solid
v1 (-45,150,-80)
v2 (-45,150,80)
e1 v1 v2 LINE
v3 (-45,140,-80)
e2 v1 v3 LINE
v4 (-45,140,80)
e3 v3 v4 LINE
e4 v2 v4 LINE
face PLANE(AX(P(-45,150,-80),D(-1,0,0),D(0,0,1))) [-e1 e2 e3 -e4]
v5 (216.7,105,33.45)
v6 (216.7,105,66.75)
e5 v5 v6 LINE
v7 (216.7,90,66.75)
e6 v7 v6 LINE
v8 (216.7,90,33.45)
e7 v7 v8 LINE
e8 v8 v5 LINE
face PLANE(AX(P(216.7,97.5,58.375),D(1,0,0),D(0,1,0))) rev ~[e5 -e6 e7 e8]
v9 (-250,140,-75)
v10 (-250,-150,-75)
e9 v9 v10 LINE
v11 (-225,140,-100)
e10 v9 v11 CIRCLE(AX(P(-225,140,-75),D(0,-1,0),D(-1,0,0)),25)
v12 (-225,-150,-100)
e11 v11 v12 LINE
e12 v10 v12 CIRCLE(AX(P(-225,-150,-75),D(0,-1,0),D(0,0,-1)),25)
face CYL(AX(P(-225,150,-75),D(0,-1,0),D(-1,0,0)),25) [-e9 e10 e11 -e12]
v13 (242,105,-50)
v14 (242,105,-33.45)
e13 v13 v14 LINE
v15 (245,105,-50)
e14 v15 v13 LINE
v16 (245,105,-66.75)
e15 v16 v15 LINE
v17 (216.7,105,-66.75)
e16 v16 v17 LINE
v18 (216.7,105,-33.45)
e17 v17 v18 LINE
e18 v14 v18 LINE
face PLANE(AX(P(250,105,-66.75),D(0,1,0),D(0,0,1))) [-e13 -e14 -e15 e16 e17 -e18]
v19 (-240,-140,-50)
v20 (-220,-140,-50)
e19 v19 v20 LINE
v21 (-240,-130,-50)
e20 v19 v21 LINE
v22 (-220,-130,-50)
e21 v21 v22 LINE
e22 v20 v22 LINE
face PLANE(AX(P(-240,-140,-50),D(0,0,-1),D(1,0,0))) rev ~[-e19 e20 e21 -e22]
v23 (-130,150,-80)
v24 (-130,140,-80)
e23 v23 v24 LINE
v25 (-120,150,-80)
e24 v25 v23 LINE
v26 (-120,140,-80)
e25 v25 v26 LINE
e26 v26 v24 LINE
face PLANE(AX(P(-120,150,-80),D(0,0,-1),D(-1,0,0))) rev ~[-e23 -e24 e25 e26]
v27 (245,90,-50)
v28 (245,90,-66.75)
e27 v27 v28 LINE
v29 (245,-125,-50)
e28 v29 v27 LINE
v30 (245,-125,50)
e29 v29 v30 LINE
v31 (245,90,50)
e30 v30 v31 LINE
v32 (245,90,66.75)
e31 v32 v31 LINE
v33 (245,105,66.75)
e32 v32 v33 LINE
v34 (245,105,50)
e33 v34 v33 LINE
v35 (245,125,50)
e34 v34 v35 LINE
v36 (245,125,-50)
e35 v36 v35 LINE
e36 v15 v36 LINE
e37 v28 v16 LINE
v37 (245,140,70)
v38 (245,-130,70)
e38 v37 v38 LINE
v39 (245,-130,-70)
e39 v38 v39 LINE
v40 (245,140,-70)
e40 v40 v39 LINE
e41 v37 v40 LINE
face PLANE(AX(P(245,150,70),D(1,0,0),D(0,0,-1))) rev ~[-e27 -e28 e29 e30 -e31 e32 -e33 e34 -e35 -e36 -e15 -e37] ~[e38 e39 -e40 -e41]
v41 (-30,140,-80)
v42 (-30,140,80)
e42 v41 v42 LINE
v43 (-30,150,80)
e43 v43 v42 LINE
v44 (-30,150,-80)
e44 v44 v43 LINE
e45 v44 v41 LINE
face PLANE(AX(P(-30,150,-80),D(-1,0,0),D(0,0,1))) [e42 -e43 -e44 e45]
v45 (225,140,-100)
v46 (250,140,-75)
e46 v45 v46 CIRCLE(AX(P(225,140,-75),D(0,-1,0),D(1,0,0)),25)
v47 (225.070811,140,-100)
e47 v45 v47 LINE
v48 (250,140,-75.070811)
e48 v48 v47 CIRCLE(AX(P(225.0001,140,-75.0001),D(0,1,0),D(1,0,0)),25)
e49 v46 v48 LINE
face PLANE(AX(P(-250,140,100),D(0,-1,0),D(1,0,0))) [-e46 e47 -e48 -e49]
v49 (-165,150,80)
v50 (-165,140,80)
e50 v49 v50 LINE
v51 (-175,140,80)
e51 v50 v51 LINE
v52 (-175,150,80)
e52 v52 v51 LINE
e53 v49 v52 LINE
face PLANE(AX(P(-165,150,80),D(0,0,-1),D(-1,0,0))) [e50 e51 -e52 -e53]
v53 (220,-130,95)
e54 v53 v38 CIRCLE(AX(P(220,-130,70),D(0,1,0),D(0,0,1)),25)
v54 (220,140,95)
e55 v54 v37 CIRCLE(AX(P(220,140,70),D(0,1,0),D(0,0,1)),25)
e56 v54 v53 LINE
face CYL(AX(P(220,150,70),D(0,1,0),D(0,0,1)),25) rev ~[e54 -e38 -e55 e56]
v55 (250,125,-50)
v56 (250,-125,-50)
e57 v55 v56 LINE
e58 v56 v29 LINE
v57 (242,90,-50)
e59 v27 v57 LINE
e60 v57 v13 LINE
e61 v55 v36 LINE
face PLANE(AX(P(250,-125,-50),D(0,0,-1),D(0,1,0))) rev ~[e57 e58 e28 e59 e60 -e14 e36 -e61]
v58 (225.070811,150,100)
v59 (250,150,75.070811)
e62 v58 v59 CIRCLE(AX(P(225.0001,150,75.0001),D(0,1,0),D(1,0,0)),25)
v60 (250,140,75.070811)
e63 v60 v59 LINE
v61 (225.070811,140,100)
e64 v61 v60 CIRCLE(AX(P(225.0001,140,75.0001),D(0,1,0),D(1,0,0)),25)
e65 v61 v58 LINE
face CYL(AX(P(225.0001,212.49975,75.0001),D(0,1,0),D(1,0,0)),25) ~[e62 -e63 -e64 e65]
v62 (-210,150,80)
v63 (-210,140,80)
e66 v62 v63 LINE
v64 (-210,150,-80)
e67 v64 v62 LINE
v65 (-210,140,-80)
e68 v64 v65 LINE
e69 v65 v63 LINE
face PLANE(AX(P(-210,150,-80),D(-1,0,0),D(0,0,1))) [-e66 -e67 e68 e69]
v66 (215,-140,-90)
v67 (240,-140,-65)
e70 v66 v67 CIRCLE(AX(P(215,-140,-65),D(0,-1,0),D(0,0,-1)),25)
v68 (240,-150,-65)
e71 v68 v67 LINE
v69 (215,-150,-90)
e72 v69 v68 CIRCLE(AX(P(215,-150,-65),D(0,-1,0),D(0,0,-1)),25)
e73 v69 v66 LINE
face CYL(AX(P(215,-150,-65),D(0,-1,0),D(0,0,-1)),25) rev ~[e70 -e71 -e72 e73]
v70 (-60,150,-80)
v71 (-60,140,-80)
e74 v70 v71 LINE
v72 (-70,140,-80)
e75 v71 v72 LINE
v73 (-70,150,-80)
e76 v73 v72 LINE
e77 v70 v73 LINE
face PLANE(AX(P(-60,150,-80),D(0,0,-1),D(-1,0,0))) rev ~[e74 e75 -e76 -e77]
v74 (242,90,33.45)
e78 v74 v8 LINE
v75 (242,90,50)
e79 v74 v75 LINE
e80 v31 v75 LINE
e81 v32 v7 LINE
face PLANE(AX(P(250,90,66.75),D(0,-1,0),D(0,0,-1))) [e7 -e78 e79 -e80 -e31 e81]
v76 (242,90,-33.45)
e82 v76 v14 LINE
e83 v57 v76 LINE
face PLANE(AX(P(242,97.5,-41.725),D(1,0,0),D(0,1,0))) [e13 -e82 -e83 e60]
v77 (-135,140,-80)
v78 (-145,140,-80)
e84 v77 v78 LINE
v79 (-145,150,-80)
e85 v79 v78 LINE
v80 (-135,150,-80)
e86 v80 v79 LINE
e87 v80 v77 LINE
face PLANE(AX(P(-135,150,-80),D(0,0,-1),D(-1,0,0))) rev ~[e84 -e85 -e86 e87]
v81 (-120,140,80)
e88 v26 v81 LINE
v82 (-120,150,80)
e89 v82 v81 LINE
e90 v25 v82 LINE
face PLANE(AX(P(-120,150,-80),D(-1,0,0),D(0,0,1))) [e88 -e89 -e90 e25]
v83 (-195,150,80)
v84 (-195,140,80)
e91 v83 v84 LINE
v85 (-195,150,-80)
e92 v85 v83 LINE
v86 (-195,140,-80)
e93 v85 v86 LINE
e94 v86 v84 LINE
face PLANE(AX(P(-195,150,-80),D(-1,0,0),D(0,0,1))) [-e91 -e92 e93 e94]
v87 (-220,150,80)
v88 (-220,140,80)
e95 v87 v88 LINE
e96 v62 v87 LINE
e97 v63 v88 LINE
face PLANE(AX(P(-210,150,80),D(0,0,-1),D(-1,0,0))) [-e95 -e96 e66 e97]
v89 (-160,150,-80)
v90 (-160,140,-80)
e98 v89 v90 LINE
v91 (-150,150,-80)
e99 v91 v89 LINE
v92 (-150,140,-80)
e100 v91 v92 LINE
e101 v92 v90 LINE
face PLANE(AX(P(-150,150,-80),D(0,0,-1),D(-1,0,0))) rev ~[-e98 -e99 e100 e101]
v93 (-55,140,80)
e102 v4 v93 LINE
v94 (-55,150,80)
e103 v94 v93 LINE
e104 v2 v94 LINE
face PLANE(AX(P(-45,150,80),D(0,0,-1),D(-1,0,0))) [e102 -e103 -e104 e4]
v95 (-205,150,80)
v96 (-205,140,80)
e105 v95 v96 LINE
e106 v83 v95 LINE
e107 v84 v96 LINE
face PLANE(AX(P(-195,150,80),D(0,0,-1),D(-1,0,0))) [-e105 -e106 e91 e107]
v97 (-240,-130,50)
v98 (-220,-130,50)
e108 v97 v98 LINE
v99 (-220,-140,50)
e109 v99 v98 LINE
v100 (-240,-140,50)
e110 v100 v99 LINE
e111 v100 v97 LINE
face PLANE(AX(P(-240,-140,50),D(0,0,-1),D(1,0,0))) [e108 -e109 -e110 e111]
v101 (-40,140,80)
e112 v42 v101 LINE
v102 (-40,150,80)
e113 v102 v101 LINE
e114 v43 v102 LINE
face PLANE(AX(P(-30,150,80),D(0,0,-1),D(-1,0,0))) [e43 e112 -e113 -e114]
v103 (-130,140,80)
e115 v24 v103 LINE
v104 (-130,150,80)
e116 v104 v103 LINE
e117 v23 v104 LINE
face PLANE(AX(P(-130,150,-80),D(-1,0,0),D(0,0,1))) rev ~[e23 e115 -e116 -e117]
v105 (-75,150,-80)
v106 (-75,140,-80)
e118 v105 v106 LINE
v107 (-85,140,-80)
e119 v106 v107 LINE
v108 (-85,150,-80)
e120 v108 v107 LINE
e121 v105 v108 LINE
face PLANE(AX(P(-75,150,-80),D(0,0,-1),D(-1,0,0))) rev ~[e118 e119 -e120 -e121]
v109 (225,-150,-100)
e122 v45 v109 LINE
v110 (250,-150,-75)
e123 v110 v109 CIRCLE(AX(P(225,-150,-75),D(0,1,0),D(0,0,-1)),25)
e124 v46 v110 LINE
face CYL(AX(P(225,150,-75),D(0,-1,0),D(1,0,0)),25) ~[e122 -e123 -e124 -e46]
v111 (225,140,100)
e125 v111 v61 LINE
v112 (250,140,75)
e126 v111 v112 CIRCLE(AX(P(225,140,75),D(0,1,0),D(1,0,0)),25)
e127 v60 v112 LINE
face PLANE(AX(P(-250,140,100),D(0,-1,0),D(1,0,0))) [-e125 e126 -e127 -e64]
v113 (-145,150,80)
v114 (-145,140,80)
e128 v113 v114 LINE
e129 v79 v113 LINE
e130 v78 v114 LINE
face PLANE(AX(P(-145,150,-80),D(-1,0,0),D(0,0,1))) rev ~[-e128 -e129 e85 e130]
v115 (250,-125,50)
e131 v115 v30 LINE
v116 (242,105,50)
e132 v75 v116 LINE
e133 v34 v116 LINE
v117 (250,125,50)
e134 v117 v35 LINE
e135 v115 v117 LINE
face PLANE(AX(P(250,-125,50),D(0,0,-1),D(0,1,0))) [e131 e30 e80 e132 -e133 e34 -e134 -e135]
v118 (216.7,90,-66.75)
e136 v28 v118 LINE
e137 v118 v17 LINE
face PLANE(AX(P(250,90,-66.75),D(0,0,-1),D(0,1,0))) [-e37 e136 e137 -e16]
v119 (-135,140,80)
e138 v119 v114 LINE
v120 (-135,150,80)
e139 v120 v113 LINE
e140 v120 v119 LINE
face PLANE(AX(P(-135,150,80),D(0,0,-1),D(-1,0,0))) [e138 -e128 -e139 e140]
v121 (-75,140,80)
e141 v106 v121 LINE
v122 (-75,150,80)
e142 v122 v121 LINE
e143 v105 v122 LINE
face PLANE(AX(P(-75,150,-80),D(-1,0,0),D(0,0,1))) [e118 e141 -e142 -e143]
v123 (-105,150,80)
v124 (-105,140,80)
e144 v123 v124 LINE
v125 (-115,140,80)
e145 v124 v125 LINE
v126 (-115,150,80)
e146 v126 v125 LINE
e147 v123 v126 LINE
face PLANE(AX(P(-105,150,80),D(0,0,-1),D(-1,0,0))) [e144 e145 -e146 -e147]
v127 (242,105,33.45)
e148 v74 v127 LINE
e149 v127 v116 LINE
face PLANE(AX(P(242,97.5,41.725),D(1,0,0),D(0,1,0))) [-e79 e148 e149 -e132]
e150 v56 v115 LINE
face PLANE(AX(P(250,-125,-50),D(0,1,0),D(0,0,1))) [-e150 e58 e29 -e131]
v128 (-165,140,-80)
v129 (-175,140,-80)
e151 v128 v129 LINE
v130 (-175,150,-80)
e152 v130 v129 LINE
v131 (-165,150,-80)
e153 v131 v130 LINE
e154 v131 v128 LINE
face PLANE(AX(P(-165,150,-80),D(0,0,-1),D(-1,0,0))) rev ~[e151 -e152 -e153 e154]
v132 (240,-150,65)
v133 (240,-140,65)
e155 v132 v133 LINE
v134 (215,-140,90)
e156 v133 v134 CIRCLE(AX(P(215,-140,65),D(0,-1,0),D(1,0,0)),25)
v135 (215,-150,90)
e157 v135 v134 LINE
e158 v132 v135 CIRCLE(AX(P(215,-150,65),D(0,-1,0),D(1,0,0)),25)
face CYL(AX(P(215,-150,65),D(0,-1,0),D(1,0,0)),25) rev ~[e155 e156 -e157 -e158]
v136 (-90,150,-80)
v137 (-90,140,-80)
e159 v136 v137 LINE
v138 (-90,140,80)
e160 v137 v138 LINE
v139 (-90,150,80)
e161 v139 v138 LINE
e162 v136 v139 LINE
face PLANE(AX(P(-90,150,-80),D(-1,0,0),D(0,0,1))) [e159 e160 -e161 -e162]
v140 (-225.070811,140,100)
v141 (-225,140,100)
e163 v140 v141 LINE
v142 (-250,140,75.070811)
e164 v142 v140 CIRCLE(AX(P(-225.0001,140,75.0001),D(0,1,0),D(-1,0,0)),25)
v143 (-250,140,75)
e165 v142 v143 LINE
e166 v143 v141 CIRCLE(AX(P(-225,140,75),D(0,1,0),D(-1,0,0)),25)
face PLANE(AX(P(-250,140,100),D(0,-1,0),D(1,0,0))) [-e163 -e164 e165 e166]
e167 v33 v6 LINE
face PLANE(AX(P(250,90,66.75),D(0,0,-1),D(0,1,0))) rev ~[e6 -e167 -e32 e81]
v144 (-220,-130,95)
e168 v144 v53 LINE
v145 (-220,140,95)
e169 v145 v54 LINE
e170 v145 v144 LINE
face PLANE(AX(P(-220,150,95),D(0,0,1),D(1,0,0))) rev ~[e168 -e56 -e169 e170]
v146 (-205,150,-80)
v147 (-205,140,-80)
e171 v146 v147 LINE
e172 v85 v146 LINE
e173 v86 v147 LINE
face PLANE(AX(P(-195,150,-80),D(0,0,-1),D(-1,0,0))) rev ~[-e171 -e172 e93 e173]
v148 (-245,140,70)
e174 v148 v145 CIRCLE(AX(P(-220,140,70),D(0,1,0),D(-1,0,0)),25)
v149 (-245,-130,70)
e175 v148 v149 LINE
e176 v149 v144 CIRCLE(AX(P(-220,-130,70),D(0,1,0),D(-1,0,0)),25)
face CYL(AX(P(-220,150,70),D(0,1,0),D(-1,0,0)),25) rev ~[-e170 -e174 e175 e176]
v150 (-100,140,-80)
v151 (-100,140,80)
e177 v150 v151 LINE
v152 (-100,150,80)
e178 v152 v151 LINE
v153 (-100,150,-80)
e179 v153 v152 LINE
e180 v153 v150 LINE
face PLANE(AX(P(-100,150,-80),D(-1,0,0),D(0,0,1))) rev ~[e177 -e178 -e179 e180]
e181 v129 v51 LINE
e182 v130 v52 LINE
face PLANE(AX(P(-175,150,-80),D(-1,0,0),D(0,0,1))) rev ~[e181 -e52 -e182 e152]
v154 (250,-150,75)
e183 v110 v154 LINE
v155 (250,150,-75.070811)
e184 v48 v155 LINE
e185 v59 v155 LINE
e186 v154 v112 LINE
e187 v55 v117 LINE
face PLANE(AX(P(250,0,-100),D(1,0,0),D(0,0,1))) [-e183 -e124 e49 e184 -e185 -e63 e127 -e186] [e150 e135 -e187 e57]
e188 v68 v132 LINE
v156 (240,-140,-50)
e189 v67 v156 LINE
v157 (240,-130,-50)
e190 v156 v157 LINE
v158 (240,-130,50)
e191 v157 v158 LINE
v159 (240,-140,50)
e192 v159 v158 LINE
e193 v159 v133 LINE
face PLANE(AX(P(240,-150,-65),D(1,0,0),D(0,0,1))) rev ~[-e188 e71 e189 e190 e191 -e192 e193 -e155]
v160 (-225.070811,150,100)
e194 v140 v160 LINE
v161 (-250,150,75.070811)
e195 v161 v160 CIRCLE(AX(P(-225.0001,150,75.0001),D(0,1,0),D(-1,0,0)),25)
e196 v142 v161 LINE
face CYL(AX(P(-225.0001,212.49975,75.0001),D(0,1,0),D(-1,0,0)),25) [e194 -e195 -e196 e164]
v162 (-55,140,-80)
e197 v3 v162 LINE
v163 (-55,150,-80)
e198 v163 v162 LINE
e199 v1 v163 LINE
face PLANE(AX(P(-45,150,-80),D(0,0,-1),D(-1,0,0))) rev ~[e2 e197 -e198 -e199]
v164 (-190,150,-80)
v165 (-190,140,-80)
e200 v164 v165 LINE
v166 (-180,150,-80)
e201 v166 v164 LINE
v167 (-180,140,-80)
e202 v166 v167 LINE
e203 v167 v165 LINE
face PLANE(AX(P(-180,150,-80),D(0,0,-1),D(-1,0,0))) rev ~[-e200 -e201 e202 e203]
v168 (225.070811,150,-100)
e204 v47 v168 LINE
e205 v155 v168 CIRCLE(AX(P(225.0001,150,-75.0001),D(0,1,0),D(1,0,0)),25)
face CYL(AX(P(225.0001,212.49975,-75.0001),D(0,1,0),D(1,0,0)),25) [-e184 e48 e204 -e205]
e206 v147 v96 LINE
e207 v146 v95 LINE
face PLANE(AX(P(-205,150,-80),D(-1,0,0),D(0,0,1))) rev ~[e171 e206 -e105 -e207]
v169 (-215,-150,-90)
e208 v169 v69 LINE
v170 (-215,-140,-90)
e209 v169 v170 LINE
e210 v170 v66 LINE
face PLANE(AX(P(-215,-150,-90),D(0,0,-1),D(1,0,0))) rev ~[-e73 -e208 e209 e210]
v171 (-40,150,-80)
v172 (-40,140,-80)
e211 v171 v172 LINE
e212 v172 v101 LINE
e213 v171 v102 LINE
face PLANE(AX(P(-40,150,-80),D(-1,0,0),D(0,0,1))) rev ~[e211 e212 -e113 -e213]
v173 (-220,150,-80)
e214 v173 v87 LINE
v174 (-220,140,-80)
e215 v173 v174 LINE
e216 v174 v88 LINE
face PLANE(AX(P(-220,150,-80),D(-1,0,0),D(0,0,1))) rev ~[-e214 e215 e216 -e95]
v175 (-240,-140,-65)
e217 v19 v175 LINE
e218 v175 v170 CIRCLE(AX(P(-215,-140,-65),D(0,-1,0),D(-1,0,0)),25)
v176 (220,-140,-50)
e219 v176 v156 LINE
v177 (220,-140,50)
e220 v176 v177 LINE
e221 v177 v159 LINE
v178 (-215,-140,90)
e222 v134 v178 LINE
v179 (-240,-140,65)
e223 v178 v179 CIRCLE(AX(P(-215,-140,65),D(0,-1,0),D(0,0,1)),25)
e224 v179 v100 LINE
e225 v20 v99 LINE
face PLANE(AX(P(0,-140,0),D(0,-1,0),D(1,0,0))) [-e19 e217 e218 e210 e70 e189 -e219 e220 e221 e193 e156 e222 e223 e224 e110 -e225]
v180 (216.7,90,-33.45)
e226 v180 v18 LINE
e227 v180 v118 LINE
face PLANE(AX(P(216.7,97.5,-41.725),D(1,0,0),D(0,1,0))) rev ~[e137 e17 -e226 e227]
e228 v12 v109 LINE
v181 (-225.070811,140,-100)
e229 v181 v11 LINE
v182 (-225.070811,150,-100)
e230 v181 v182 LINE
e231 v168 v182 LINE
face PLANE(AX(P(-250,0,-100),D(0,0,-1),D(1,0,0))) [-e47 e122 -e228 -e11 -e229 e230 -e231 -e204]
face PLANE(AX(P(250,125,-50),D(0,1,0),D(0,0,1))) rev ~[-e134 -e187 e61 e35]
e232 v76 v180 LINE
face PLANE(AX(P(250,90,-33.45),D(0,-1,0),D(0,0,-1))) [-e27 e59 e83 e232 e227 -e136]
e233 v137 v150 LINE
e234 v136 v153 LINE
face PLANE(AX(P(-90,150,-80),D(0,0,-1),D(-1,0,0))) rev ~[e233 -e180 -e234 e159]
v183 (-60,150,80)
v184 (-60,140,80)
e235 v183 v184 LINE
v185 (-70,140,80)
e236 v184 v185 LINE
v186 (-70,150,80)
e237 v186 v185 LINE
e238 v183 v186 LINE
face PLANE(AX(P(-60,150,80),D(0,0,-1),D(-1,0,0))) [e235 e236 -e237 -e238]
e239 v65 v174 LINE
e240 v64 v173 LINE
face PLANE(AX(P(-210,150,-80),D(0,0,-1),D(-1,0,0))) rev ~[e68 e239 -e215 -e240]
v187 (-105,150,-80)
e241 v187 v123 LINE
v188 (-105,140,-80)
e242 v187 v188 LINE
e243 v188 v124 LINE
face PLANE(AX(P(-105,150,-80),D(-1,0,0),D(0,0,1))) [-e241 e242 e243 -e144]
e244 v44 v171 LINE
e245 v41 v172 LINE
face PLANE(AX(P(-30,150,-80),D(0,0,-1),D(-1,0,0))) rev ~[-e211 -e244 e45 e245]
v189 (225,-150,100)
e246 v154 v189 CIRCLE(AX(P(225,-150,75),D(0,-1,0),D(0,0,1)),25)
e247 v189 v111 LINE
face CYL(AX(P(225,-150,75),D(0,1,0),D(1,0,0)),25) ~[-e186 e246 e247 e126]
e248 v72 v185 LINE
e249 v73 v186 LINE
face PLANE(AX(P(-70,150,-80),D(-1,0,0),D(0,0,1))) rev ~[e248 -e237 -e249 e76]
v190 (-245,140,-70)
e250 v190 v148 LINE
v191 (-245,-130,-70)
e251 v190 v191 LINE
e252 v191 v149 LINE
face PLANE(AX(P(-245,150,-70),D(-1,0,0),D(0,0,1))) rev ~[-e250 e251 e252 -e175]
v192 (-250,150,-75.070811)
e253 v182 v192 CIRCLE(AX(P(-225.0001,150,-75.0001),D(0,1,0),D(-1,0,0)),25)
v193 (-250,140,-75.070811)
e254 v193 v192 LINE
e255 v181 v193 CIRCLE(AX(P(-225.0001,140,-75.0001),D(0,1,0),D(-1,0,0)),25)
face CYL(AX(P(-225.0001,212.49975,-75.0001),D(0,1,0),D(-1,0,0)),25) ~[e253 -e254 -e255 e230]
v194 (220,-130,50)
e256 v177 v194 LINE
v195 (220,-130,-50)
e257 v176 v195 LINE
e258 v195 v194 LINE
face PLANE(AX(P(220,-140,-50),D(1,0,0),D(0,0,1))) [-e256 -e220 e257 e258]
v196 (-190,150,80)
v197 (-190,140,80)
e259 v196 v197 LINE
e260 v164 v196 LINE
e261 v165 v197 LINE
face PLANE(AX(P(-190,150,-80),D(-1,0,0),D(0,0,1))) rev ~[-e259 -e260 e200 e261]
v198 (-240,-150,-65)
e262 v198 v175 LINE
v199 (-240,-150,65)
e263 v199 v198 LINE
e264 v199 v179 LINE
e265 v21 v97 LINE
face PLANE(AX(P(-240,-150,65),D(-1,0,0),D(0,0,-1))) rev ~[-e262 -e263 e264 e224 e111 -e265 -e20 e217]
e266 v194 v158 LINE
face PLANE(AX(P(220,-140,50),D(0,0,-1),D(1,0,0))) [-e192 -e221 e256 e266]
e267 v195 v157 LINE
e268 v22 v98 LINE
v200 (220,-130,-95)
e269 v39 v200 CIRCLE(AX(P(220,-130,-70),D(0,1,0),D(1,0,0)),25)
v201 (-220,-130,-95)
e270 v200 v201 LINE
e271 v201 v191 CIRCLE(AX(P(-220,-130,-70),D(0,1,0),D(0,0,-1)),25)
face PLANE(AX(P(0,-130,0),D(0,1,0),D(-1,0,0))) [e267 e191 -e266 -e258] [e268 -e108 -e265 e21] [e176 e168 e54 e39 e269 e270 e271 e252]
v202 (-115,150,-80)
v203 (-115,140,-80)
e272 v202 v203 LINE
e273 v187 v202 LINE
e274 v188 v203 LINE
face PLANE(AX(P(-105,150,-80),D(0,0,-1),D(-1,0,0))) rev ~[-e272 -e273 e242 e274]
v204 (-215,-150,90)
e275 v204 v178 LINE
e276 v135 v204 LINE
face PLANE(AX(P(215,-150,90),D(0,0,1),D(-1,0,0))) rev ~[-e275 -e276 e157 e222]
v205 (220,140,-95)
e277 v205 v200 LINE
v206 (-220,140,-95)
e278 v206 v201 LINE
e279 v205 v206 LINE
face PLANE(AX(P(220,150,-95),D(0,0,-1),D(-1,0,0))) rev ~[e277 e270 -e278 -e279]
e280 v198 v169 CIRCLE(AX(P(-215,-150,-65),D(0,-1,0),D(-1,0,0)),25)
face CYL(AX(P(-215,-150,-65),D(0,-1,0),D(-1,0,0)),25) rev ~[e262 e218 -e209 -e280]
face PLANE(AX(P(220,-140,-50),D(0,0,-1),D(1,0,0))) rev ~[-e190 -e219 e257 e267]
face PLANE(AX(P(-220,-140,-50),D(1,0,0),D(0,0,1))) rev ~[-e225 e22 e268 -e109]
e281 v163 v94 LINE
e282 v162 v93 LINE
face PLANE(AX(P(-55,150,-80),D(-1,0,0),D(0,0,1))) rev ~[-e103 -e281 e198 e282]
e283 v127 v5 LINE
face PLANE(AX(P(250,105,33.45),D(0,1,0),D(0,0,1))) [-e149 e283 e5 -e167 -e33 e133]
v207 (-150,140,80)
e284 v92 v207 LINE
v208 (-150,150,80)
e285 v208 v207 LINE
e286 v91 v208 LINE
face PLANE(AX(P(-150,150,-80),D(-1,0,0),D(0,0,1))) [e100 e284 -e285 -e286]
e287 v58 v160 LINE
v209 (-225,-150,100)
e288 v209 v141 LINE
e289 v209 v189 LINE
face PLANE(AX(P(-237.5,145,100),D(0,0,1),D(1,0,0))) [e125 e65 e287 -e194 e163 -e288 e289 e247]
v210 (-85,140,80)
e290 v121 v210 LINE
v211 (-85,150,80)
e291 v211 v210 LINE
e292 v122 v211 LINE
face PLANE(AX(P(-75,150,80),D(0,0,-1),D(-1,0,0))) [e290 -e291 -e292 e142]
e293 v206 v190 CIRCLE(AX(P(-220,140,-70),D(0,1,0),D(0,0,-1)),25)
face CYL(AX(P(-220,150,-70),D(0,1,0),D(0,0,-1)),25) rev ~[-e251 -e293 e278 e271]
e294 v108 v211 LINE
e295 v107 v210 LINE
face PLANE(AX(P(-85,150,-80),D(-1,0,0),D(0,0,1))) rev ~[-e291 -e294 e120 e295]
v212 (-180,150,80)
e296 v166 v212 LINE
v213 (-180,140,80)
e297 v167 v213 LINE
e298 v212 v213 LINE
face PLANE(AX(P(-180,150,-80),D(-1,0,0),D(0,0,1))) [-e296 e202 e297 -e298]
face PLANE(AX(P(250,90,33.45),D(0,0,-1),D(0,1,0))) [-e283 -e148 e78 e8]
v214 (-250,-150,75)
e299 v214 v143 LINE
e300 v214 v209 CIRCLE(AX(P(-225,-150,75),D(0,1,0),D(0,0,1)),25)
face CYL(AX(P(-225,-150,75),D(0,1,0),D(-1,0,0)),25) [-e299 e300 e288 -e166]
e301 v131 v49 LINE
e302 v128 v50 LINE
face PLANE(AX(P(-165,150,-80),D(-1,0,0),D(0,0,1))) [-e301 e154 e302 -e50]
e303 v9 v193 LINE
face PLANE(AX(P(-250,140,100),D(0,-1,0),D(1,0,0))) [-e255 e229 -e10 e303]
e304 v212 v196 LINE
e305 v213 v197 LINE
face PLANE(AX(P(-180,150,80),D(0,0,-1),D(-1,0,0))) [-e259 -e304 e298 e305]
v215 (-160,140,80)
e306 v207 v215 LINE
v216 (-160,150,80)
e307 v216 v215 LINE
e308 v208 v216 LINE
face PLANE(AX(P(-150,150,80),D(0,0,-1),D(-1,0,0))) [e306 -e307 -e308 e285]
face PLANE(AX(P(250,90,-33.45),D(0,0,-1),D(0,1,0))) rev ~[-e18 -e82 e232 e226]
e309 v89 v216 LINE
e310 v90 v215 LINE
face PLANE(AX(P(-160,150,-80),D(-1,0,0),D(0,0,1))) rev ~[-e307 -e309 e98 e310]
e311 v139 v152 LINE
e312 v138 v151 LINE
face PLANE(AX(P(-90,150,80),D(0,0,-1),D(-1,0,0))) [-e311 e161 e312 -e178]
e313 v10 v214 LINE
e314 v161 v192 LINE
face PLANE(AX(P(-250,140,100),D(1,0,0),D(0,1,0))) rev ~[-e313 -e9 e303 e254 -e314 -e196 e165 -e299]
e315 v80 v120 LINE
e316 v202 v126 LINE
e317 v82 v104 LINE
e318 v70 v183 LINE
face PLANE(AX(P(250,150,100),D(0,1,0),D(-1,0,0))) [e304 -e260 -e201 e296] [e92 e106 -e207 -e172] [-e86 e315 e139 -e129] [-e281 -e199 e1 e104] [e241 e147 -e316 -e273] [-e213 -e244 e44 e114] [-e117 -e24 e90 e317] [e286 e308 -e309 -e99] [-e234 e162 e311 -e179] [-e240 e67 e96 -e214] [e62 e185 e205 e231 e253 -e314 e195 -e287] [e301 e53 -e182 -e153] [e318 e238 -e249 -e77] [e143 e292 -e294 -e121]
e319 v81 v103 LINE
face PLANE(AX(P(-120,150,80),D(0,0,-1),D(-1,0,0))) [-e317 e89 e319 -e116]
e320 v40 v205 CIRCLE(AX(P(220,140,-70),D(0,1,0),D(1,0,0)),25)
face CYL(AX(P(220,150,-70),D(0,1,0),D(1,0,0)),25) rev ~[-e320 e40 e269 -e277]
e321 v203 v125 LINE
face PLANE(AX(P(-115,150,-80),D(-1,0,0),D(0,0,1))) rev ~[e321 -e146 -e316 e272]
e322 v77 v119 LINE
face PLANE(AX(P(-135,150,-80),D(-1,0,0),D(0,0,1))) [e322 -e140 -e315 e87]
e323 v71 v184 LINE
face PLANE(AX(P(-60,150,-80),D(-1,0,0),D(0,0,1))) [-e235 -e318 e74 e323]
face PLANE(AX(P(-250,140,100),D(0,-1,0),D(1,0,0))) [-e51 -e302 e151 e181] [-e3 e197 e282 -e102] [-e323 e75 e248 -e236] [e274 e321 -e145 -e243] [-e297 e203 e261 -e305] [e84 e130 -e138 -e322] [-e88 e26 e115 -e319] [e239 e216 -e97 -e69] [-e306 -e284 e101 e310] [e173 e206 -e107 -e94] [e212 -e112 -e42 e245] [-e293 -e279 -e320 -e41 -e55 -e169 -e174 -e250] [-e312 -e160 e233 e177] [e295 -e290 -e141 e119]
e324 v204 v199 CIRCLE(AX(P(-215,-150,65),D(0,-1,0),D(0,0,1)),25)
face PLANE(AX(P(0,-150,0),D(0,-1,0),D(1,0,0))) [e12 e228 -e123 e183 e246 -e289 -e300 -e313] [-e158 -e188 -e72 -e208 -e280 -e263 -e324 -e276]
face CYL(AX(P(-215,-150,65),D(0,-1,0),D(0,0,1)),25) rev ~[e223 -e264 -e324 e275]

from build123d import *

# Parameters (mm, degrees)
F0_W         = 500
F0_H         = 200
F1_DEPTH     = 150
F2_R         = 25
F4_DEPTH     = 10
F6_DEPTH     = 280
F7_W         = 20
F7_H         = 100
F8_DEPTH     = 10
F9_W         = 25
F9_H         = 10
F9_W_2       = 450
F10_DEPTH    = 200
F11_T1_DEPTH = 134.999500001
F12_W        = 250
F12_H        = 100
F13_DEPTH    = 5
F14_W        = 10
F14_H        = 160
F15_DEPTH    = 10
F16_W        = 15
F16_H        = 16.75
F16_H_2      = 16.55
F17_DEPTH    = 33.3
F18_W        = 15
F18_H        = 16.55
F19_DEPTH    = 8


# Not quite as in the source:
# - a fillet or chamfer that OpenCascade refuses, or shapes differently, is made with other operations: its cross-section is extruded or revolved along the edge and cut away or added
# - a feature names something its author has since deleted; it is built from what else it names


with BuildPart() as f1:
    # F0 (on Front) → F1 (new body, symmetric)
    with BuildSketch(Plane.XZ):
        Rectangle(F0_W, F0_H)
    extrude(amount=F1_DEPTH, both=True)

    # F2
    f2_edges = [f1.edges().sort_by_distance(p)[0] for p in [
        (-250, 0, 100),
        (250, 0, 100),
        (250, 0, -100),
        (-250, 0, -100),
    ]]
    fillet(f2_edges, radius=F2_R)

    # F3 (on face) → F4 (cut)
    with BuildSketch(Plane.XZ.offset(150)):
        with BuildLine():
            ThreePointArc((240, 65), (232.6776695297, 82.6776695297), (215, 90))
            Line((215, 90), (-215, 90))
            ThreePointArc((-215, 90), (-232.6776695297, 82.6776695297), (-240, 65))
            Line((-240, 65), (-240, -65))
            ThreePointArc((-240, -65), (-232.6776695297, -82.6776695297), (-215, -90))
            Line((-215, -90), (215, -90))
            ThreePointArc((215, -90), (232.6776695297, -82.6776695297), (240, -65))
            Line((240, -65), (240, 65))
        make_face()
    extrude(amount=-F4_DEPTH, mode=Mode.SUBTRACT)

    # F5 (on face) → F6 (cut)
    with BuildSketch(Plane(origin=(0, 150, 0), x_dir=(-1, 0, 0), z_dir=(0, 1, 0))):
        with BuildLine():
            ThreePointArc((245, 70), (237.6776695297, 87.6776695297), (220, 95))
            Line((220, 95), (-220, 95))
            ThreePointArc((-220, 95), (-237.6776695297, 87.6776695297), (-245, 70))
            Line((-245, 70), (-245, -70))
            ThreePointArc((-245, -70), (-237.6776695297, -87.6776695297), (-220, -95))
            Line((-220, -95), (220, -95))
            ThreePointArc((220, -95), (237.6776695297, -87.6776695297), (245, -70))
            Line((245, -70), (245, 70))
        make_face()
    extrude(amount=-F6_DEPTH, mode=Mode.SUBTRACT)

    # F7 (on face) → F8 (cut, through all)
    with BuildSketch(Plane.XZ.offset(140)):
        with Locations((-230, 0)):
            Rectangle(F7_W, F7_H)
        with Locations((230, 0)):
            Rectangle(F7_W, F7_H)
    extrude(amount=-F8_DEPTH, mode=Mode.SUBTRACT)

    # F9 (on face) → F10 (join, through all)
    with BuildSketch(Plane.XY.offset(100)):
        with Locations((-237.5, 145)):
            Rectangle(F9_W, F9_H)
        with Locations((0, 145)):
            Rectangle(F9_W_2, F9_H)
        with Locations((237.5, 145)):
            Rectangle(F9_W, F9_H)
    extrude(amount=-F10_DEPTH)

    # F11: fillet of radius 25 on 4 edges, made by hand

    # F11_s2 → F11_t1 (cut)
    with BuildSketch(Plane.XZ.offset(-212.4997500005)):
        with BuildLine():
            ThreePointArc((-250.0001, 75.0001), (-242.6777695297, 92.6777695297), (-225.0001, 100.0001))
            Line((-225.0001, 100.0001), (-225.0001, 100.5001))
            ThreePointArc((-225.0001, 100.5001), (-237.50005, 100.5), (-250, 100.5))
            Line((-250, 100.5), (-250.5, 100))
            ThreePointArc((-250.5, 100), (-250.5, 87.50005), (-250.5001, 75.0001))
            Line((-250.5001, 75.0001), (-250.0001, 75.0001))
        make_face()
        with BuildLine():
            ThreePointArc((-250.0001, -75.0001), (-242.6777695297, -92.6777695297), (-225.0001, -100.0001))
            Line((-225.0001, -100.0001), (-225.0001, -100.5001))
            ThreePointArc((-225.0001, -100.5001), (-237.50005, -100.5), (-250, -100.5))
            Line((-250, -100.5), (-250.5, -100))
            ThreePointArc((-250.5, -100), (-250.5, -87.50005), (-250.5001, -75.0001))
            Line((-250.5001, -75.0001), (-250.0001, -75.0001))
        make_face()
        with BuildLine():
            ThreePointArc((250.0001, 75.0001), (242.6777695297, 92.6777695297), (225.0001, 100.0001))
            Line((225.0001, 100.0001), (225.0001, 100.5001))
            ThreePointArc((225.0001, 100.5001), (237.50005, 100.5), (250, 100.5))
            Line((250, 100.5), (250.5, 100))
            ThreePointArc((250.5, 100), (250.5, 87.50005), (250.5001, 75.0001))
            Line((250.5001, 75.0001), (250.0001, 75.0001))
        make_face()
        with BuildLine():
            ThreePointArc((250.0001, -75.0001), (242.6777695297, -92.6777695297), (225.0001, -100.0001))
            Line((225.0001, -100.0001), (225.0001, -100.5001))
            ThreePointArc((225.0001, -100.5001), (237.50005, -100.5), (250, -100.5))
            Line((250, -100.5), (250.5, -100))
            ThreePointArc((250.5, -100), (250.5, -87.50005), (250.5001, -75.0001))
            Line((250.5001, -75.0001), (250.0001, -75.0001))
        make_face()
    extrude(amount=F11_T1_DEPTH, mode=Mode.SUBTRACT)

    # F12 (on face) → F13 (cut, through all)
    with BuildSketch(Plane.YZ.offset(250)):
        Rectangle(F12_W, F12_H)
    extrude(amount=-F13_DEPTH, mode=Mode.SUBTRACT)

    # F14 (on face) → F15 (cut, through all)
    with BuildSketch(Plane(origin=(0, 150, 0), x_dir=(-1, 0, 0), z_dir=(0, 1, 0))):
        with Locations((35, 0)):
            Rectangle(F14_W, F14_H)
        with Locations((50, 0)):
            Rectangle(F14_W, F14_H)
        with Locations((65, 0)):
            Rectangle(F14_W, F14_H)
        with Locations((80, 0)):
            Rectangle(F14_W, F14_H)
        with Locations((95, 0)):
            Rectangle(F14_W, F14_H)
        with Locations((110, 0)):
            Rectangle(F14_W, F14_H)
        with Locations((125, 0)):
            Rectangle(F14_W, F14_H)
        with Locations((140, 0)):
            Rectangle(F14_W, F14_H)
        with Locations((155, 0)):
            Rectangle(F14_W, F14_H)
        with Locations((170, 0)):
            Rectangle(F14_W, F14_H)
        with Locations((185, 0)):
            Rectangle(F14_W, F14_H)
        with Locations((200, 0)):
            Rectangle(F14_W, F14_H)
        with Locations((215, 0)):
            Rectangle(F14_W, F14_H)
    extrude(amount=-F15_DEPTH, mode=Mode.SUBTRACT)

    # F16 (on face) → F17 (join)
    with BuildSketch(Plane.YZ.offset(250)):
        with Locations((97.5, 58.375)):
            Rectangle(F16_W, F16_H)
        with Locations((97.5, 41.725)):
            Rectangle(F16_W, F16_H_2)
        with Locations((97.5, -41.725)):
            Rectangle(F16_W, F16_H_2)
        with Locations((97.5, -58.375)):
            Rectangle(F16_W, F16_H)
    extrude(amount=-F17_DEPTH)

    # F18 (on face) → F19 (cut)
    with BuildSketch(Plane.YZ.offset(250)):
        with Locations((97.5, 41.725)):
            Rectangle(F18_W, F18_H)
        with Locations((97.5, -41.725)):
            Rectangle(F18_W, F18_H)
    extrude(amount=-F19_DEPTH, mode=Mode.SUBTRACT)


solid = f1.part
